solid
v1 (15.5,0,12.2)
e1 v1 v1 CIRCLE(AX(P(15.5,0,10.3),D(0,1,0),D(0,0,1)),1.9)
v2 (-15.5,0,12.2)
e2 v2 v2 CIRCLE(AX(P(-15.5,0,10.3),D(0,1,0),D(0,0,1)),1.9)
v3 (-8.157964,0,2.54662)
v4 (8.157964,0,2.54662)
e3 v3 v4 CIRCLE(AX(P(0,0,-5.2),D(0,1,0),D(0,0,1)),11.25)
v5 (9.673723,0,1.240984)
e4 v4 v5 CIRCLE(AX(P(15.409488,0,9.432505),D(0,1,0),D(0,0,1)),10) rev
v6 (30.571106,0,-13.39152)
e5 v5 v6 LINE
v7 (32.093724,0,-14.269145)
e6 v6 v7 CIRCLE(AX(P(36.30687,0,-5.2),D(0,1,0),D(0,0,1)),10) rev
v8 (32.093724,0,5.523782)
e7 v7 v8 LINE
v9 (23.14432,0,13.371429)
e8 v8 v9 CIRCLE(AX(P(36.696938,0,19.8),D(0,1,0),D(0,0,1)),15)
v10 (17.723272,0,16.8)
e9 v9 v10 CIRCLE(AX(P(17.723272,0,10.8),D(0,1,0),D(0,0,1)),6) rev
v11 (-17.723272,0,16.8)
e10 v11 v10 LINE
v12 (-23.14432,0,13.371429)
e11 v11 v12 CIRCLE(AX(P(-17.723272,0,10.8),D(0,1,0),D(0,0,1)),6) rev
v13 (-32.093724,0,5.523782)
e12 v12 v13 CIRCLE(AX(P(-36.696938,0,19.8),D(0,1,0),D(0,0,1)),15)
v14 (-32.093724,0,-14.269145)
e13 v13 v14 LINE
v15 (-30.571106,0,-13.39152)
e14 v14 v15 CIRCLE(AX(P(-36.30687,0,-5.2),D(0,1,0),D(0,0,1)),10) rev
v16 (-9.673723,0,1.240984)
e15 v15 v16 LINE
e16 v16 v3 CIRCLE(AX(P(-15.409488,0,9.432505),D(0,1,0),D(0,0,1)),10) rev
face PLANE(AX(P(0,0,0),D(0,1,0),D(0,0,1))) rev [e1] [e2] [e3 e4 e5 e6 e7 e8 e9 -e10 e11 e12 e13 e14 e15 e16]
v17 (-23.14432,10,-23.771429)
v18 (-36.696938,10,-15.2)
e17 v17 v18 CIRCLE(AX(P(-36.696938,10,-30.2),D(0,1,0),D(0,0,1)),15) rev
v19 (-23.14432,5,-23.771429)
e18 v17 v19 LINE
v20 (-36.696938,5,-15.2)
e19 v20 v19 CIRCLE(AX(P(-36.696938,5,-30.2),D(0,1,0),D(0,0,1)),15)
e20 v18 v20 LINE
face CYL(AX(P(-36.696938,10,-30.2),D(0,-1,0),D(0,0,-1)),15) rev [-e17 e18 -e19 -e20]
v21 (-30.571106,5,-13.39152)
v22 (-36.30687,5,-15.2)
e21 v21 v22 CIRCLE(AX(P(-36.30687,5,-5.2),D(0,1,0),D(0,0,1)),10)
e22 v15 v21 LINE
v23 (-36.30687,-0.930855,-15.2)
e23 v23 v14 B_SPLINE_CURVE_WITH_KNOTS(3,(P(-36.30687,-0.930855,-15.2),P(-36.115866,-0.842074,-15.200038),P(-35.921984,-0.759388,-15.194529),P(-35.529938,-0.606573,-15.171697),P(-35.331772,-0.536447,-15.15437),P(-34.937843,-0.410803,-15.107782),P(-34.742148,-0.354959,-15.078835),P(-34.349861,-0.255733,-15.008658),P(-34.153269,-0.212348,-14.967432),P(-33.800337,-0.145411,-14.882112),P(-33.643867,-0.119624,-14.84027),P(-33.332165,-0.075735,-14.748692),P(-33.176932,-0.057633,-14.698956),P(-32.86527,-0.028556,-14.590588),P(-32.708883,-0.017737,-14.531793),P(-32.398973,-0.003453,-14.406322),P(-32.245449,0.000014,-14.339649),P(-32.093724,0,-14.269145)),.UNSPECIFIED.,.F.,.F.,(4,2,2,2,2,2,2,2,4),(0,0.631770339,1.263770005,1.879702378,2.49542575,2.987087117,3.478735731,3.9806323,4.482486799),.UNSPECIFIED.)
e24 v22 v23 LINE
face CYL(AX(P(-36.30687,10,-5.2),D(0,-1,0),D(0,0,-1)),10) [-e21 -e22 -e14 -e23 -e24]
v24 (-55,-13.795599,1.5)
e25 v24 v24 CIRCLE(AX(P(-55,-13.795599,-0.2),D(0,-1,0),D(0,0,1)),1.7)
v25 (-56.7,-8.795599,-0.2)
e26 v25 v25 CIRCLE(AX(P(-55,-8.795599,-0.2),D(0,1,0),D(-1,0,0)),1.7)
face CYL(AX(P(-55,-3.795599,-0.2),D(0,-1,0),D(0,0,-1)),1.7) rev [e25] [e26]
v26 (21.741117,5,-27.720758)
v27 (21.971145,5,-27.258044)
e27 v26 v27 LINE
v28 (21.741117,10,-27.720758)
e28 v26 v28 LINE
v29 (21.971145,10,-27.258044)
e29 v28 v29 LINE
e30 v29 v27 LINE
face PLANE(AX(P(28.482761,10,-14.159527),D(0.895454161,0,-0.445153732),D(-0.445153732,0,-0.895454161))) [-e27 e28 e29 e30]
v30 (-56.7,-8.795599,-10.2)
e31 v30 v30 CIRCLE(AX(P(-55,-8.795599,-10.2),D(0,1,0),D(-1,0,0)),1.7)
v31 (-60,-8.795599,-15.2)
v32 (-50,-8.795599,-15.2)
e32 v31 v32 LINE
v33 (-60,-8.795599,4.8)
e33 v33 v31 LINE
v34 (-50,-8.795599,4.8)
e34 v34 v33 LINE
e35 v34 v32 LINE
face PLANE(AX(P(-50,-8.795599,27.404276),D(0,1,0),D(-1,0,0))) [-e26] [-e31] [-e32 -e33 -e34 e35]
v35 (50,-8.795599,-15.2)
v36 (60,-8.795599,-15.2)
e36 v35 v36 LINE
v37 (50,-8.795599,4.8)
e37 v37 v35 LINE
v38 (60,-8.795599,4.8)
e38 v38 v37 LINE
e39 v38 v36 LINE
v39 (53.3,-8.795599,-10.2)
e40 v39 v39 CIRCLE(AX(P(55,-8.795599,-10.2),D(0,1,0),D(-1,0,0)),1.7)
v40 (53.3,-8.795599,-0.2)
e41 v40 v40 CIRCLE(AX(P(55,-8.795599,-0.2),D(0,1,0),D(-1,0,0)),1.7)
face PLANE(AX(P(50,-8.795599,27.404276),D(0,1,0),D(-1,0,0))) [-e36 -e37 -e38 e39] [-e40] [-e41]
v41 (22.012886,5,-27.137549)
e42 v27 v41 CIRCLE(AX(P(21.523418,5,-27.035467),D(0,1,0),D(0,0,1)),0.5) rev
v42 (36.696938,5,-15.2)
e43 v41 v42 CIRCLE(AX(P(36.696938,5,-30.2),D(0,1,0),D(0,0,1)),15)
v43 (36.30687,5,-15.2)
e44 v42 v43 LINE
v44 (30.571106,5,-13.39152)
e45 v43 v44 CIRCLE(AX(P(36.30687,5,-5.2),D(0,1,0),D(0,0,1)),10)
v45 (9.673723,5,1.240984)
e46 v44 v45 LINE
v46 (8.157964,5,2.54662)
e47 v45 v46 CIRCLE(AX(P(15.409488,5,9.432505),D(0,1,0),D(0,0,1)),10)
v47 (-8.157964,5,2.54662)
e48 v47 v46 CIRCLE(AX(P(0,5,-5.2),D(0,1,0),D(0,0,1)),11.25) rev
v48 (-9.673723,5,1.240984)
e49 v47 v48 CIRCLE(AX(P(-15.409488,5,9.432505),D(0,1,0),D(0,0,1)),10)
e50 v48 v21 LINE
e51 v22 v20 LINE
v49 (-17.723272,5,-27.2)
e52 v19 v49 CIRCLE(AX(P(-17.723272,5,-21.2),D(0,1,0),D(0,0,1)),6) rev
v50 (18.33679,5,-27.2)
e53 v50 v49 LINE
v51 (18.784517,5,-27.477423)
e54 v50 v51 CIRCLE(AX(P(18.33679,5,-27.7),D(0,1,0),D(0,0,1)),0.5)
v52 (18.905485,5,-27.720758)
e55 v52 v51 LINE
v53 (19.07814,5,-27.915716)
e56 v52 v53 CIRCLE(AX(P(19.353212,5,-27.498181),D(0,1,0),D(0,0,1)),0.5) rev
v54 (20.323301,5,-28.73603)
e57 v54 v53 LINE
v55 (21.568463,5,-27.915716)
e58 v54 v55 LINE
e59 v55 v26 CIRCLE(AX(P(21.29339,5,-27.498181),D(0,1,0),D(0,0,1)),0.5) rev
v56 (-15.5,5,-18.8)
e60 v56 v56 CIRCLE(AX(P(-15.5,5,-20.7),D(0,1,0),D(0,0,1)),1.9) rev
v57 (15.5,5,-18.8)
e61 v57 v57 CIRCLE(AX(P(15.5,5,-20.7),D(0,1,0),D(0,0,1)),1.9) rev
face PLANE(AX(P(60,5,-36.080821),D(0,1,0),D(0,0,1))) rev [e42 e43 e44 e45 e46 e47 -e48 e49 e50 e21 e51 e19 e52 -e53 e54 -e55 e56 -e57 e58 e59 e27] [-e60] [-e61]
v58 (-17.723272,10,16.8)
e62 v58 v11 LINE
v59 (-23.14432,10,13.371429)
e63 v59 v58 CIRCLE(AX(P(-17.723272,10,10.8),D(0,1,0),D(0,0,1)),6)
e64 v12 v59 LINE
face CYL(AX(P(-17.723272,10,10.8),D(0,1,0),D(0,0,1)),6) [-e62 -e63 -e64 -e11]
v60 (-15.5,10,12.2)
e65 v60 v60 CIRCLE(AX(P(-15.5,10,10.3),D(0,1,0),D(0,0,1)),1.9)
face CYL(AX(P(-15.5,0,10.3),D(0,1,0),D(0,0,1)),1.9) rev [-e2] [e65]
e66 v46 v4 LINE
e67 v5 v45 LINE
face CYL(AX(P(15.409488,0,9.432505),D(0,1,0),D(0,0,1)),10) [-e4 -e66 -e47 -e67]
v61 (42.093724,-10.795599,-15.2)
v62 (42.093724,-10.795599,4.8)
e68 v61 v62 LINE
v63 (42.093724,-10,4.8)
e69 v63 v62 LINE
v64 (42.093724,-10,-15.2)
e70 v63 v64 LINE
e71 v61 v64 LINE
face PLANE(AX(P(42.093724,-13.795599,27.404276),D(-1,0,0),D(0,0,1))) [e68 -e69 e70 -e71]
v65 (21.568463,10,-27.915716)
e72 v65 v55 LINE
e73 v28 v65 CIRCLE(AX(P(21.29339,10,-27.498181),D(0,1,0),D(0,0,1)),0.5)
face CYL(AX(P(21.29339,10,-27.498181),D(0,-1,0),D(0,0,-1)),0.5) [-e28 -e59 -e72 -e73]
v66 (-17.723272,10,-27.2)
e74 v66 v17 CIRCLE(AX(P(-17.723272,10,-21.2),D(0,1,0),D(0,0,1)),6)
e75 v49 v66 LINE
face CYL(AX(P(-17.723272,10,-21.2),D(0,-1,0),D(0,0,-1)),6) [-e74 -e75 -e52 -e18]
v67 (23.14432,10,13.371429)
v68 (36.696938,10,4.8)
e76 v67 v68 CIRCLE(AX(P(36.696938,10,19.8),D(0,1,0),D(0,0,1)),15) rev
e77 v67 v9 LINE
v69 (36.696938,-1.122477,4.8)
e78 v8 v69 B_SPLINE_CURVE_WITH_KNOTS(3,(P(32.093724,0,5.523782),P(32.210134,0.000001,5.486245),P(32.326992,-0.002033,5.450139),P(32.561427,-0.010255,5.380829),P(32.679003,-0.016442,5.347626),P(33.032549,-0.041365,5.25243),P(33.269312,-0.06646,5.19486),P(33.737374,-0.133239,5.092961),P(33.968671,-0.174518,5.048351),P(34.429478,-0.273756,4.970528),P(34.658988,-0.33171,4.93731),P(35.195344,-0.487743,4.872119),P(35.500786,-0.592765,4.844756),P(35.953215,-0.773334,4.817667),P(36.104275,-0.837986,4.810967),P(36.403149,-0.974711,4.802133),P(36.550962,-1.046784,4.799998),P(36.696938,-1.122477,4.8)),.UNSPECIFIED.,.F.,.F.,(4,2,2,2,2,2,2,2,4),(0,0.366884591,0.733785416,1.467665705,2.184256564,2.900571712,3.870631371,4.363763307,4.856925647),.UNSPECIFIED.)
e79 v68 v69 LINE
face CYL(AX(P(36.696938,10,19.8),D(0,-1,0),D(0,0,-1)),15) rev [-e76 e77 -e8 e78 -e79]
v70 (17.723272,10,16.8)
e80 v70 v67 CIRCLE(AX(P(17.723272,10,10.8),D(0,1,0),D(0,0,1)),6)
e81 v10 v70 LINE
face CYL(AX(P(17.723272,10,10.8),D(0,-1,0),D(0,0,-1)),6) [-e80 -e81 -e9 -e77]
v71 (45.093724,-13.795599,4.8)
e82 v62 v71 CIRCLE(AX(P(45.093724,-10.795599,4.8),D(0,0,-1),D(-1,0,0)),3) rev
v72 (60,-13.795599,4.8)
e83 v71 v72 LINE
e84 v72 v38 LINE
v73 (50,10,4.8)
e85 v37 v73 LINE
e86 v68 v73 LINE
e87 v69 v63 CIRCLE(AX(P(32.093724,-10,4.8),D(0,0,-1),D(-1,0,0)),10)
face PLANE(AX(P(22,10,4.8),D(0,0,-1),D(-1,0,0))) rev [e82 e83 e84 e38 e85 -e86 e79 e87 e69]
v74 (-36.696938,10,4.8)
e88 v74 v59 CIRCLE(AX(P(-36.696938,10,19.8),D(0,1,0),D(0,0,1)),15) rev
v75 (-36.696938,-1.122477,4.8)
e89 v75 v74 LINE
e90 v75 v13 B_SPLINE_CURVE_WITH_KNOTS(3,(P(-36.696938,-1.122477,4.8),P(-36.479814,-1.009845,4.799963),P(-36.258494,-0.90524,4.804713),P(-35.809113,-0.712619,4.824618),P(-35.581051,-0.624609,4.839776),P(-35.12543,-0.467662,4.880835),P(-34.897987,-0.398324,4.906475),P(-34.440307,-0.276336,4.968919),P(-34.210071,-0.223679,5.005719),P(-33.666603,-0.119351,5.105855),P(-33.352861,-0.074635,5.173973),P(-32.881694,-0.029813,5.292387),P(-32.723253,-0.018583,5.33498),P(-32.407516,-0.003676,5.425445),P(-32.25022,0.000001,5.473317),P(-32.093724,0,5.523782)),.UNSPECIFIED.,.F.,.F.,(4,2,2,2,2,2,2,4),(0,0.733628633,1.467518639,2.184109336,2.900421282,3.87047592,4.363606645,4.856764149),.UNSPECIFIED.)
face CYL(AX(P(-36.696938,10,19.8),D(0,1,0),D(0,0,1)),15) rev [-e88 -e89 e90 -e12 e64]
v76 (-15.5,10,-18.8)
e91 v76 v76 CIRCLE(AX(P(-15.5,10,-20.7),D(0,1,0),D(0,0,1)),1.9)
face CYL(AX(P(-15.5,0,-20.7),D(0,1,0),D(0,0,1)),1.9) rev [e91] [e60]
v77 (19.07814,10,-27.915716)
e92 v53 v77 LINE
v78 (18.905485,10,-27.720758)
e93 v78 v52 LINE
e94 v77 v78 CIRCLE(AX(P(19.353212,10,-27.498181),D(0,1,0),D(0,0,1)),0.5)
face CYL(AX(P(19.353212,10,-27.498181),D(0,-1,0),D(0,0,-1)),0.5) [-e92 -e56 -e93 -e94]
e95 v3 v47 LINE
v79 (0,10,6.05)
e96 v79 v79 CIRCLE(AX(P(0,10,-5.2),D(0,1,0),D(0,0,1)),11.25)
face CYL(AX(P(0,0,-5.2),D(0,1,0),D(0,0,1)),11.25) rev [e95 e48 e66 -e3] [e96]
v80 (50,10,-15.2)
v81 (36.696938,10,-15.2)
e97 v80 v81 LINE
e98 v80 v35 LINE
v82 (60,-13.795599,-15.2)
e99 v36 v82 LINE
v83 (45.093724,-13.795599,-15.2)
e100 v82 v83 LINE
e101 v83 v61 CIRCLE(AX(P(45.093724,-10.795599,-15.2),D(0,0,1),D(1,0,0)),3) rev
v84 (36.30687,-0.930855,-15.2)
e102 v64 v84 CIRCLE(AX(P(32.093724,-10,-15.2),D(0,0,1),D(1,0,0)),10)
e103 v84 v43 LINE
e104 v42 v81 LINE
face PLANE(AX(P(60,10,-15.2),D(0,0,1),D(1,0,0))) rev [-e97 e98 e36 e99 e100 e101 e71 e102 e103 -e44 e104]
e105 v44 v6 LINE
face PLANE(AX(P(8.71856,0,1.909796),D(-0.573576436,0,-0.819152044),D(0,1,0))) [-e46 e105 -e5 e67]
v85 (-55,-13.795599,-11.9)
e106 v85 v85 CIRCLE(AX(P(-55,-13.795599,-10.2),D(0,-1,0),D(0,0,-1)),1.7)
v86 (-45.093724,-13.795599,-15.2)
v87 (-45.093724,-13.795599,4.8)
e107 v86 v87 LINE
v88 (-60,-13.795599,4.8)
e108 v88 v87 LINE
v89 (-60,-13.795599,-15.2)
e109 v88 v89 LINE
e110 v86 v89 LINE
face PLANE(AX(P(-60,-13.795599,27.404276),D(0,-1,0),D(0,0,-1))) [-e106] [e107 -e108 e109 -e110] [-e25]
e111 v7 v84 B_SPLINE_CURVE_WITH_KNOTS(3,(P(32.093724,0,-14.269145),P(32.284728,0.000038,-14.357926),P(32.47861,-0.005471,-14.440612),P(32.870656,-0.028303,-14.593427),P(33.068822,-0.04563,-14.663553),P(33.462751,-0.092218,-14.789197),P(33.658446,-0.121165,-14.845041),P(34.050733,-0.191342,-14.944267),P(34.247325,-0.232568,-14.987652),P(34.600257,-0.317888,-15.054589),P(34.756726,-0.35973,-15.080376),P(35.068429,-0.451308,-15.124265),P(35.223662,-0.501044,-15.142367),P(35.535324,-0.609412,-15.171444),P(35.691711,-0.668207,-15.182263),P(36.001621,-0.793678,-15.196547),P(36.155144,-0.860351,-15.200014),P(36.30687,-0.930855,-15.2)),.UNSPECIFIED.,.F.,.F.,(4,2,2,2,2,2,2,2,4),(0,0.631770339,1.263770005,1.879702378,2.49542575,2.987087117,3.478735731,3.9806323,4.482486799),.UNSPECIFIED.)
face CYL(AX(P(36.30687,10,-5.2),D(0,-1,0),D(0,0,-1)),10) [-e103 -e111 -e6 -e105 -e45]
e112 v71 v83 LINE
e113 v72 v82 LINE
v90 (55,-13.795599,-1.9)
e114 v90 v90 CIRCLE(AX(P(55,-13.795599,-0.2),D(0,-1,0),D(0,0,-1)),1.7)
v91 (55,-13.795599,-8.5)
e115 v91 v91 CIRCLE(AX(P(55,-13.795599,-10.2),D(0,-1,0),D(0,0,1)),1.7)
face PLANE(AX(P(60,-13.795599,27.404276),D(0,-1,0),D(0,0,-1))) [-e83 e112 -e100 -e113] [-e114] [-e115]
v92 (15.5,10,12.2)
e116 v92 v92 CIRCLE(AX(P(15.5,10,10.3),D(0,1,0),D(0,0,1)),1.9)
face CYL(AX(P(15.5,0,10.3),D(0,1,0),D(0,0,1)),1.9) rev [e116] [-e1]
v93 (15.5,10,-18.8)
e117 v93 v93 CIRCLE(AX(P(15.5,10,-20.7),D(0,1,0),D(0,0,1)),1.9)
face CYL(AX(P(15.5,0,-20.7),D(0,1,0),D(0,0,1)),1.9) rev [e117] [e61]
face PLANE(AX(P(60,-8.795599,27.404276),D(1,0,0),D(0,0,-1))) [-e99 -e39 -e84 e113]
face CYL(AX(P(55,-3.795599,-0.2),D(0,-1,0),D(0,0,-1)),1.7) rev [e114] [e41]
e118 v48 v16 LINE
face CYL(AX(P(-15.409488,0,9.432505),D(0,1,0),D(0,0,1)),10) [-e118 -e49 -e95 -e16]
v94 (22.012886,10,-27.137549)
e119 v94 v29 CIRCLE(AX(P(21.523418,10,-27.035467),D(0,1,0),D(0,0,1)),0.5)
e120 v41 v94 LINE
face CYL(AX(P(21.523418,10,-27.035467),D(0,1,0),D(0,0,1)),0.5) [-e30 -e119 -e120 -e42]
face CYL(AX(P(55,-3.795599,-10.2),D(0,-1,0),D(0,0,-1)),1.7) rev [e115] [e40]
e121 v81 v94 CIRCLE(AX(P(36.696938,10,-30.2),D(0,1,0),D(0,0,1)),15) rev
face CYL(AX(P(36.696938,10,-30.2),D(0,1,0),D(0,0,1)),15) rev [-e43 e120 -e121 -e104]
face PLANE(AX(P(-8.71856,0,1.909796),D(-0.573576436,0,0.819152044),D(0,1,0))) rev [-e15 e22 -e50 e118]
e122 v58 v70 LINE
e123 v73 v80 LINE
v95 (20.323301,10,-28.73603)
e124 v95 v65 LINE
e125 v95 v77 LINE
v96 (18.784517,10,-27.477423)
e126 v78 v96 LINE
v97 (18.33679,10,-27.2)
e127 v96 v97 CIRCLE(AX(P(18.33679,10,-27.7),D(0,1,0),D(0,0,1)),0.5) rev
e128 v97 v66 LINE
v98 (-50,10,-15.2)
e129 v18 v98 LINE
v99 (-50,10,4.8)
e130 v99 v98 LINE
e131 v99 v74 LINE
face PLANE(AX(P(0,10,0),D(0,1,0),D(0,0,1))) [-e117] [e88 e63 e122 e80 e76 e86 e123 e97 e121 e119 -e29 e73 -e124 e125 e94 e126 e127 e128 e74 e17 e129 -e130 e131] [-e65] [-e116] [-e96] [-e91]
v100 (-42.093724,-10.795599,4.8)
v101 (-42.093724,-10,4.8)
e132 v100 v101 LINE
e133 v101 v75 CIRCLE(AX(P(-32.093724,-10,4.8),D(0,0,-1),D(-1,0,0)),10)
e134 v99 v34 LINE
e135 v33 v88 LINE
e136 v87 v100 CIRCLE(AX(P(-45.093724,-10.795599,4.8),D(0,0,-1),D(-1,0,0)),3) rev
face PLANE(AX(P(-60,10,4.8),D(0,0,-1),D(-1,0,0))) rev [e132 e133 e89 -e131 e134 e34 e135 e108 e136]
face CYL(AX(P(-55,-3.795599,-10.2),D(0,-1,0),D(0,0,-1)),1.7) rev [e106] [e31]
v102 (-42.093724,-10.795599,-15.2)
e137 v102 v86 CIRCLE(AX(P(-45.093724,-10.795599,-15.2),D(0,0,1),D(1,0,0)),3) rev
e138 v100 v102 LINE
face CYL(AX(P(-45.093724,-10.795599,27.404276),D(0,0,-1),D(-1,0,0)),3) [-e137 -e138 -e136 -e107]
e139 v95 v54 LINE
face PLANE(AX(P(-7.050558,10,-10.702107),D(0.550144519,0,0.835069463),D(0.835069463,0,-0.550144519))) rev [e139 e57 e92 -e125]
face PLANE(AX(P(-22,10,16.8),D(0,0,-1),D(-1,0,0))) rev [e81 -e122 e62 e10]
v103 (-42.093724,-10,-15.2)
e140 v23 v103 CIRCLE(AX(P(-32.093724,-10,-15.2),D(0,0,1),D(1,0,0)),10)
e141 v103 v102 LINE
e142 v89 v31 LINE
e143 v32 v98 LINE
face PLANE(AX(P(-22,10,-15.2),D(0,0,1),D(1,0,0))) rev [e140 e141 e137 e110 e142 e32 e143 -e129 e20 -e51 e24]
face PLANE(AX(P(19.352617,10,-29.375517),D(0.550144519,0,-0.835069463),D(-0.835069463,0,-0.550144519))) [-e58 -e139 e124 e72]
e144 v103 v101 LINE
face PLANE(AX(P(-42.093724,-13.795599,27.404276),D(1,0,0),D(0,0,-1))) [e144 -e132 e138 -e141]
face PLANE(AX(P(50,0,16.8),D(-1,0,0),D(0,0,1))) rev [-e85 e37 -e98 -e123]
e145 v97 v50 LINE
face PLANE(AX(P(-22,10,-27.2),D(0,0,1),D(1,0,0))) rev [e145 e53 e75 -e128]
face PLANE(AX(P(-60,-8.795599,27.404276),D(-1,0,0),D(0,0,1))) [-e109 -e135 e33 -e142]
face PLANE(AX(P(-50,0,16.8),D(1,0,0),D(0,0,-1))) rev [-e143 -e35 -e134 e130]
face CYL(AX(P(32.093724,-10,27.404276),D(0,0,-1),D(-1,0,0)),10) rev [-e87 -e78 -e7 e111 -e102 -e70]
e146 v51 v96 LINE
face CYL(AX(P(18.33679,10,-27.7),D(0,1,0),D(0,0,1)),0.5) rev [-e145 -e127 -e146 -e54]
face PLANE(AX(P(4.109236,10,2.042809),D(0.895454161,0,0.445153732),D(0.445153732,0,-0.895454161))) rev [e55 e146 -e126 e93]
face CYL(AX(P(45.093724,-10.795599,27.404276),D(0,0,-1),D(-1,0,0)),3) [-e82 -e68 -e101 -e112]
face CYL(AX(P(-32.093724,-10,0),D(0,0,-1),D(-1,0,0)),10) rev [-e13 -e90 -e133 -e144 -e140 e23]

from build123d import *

# Parameters (mm, degrees)
AUFSATZ_LINEAR_AUSTRAGEN1_DEPTH      = 10
SKIZZE6_R                            = 1.9
SKIZZE6_R_2                          = 11.25
SCHNITT_LINEAR_AUSTRAGEN4_DEPTH      = 67.632124385
SKIZZE7_W                            = 20.880821379
SKIZZE7_H                            = 5
SCHNITT_LINEAR_AUSTRAGEN5_DEPTH      = 87.970339772
VERRUNDUNG3_R                        = 15
SCHNITT_LINEAR_AUSTRAGEN6_DEPTH      = 69.73136111
SCHNITT_LINEAR_AUSTRAGEN6_DEPTH_BACK = 69.73136111
SKIZZE8_W                            = 10
SKIZZE8_H                            = 10
AUFSATZ_LINEAR_AUSTRAGEN4_DEPTH      = 20
VERRUNDUNG7_R                        = 10
VERRUNDUNG8_R                        = 3
SKIZZE16_R                           = 1.7
SCHNITT_LINEAR_AUSTRAGEN8_DEPTH      = 10
AUFSATZ_LINEAR_AUSTRAGEN6_DEPTH      = 5
VERRUNDUNG9_R                        = 0.5
FASE1_START                          = -13.795598923
FASE1_DEPTH                          = 18.795598923
VERRUNDUNG10_R                       = 10
VERRUNDUNG11_R                       = 6


with BuildPart() as part:
    # Skizze1 → Aufsatz-Linear austragen1 (new body)
    with BuildSketch(Plane(origin=(0, 0, 0), x_dir=(1, 0, 0), z_dir=(0, 1, 0))):
        Polygon((-60, -4.8), (-22, -4.8), (-22, -16.8), (22, -16.8), (22, -4.8), (60, -4.8), (60, 15.2), (22, 15.2), (22, 27.2), (0, 27.2), (-22, 27.2), (-22, 15.2), (-60, 15.2), align=None)
    extrude(amount=AUFSATZ_LINEAR_AUSTRAGEN1_DEPTH)

    # Skizze6 → Schnitt-Linear austragen4 (cut, through all)
    with BuildSketch(Plane(origin=(0, 10, 0), x_dir=(1, 0, 0), z_dir=(0, 1, 0))):
        with Locations(Location((15.5, 20.7, 0), (0, 0, 270))):
            Circle(SKIZZE6_R)
        with Locations(Location((15.5, -10.3, 0), (0, 0, 270))):
            Circle(SKIZZE6_R)
        with Locations(Location((-15.5, -10.3, 0), (0, 0, 270))):
            Circle(SKIZZE6_R)
        with Locations(Location((-15.5, 20.7, 0), (0, 0, 270))):
            Circle(SKIZZE6_R)
        with Locations(Location((0, 5.2, 0), (0, 0, 270))):
            Circle(SKIZZE6_R_2)
    extrude(amount=-SCHNITT_LINEAR_AUSTRAGEN4_DEPTH, mode=Mode.SUBTRACT)

    # Skizze7 → Schnitt-Linear austragen5 (cut, through all)
    with BuildSketch(Plane.ZY.offset(22)):
        with Locations((-25.64041069, 2.5)):
            Rectangle(SKIZZE7_W, SKIZZE7_H)
    extrude(amount=-SCHNITT_LINEAR_AUSTRAGEN5_DEPTH, mode=Mode.SUBTRACT)

    # Verrundung3
    # the kernel refuses this fillet: 15 mm, written as the material it adds along each edge
    with BuildSketch(Plane(origin=(-22, 5, -15.2), x_dir=(0, 0, -1), z_dir=(0, 1, 0))) as verrundung3_piece_1:
        with BuildLine():
            CenterArc((15, 14.696938457), VERRUNDUNG3_R, 180, 78.463040967)
            Line((0, 14.696938457), (-0.3, 14.696938457))
            Line((-0.3, 14.696938457), (-0.3, 0))
            Line((-0.3, 0), (0, -0.3))
            ThreePointArc((0, -0.3), (6, -0.3), (11.94, -0.293938769))
            Line((11.94, -0.293938769), (12, 0))
        make_face()
    extrude(amount=5)
    with BuildSketch(Plane(origin=(-22, 0, 4.8), x_dir=(-1, 0, 0), z_dir=(0, 1, 0))) as verrundung3_piece_2:
        with BuildLine():
            CenterArc((14.696938457, 15), VERRUNDUNG3_R, 191.536959033, 78.463040967)
            Line((0, 12), (-0.293938769, 11.94))
            ThreePointArc((-0.293938769, 11.94), (-0.3, 6), (-0.3, 0))
            Line((-0.3, 0), (0, -0.3))
            Line((0, -0.3), (14.696938457, -0.3))
            Line((14.696938457, -0.3), (14.696938457, 0))
        make_face()
    extrude(amount=10)
    with BuildSketch(Plane(origin=(22, 0, 4.8), x_dir=(1, 0, 0), z_dir=(0, 1, 0))) as verrundung3_piece_3:
        with BuildLine():
            CenterArc((14.696938457, -15), VERRUNDUNG3_R, 90, 78.463040967)
            Line((0, -12), (-0.293938769, -11.94))
            ThreePointArc((-0.293938769, -11.94), (-0.3, -6), (-0.3, 0))
            Line((-0.3, 0), (0, 0.3))
            Line((0, 0.3), (14.696938457, 0.3))
            Line((14.696938457, 0.3), (14.696938457, 0))
        make_face()
    extrude(amount=10)
    with BuildSketch(Plane(origin=(22, 5, -15.2), x_dir=(1, 0, 0), z_dir=(0, 1, 0))) as verrundung3_piece_4:
        with BuildLine():
            CenterArc((14.696938457, 15), VERRUNDUNG3_R, 191.536959033, 78.463040967)
            Line((0, 12), (-0.293938769, 11.94))
            ThreePointArc((-0.293938769, 11.94), (-0.3, 6), (-0.3, 0))
            Line((-0.3, 0), (0, -0.3))
            Line((0, -0.3), (14.696938457, -0.3))
            Line((14.696938457, -0.3), (14.696938457, 0))
        make_face()
    extrude(amount=5)

    # Skizze8 → Schnitt-Linear austragen6 (cut, two sides: drawn at the far end of the back side and taken through both)
    with BuildSketch(Plane(origin=(0, 0, -15.2), x_dir=(-1, 0, 0), z_dir=(0, 0, -1)).offset(-SCHNITT_LINEAR_AUSTRAGEN6_DEPTH_BACK)):
        with Locations((-55, 5)):
            Rectangle(SKIZZE8_W, SKIZZE8_H)
        with Locations((55, 5)):
            Rectangle(SKIZZE8_W, SKIZZE8_H)
    extrude(amount=SCHNITT_LINEAR_AUSTRAGEN6_DEPTH + SCHNITT_LINEAR_AUSTRAGEN6_DEPTH_BACK, mode=Mode.SUBTRACT)

    # Skizze12 → Aufsatz-Linear austragen4 (add)
    with BuildSketch(Plane(origin=(0, 0, -15.2), x_dir=(-1, 0, 0), z_dir=(0, 0, -1))):
        Polygon((-50, 0), (-50, -8.795598923), (-60, -8.795598923), (-60, -13.795598923), (-42.093723734, -13.795598923), (-42.093723734, 0), align=None)
        Polygon((50, 0), (42.093723734, 0), (42.093723734, -13.795598923), (60, -13.795598923), (60, -8.795598923), (50, -8.795598923), align=None)
    extrude(amount=-AUFSATZ_LINEAR_AUSTRAGEN4_DEPTH)

    # Verrundung7
    verrundung7_edges = [part.edges().sort_by_distance(p)[0] for p in [
        (42.093723734, 0, -5.2),
        (-42.093723734, 0, -5.2),
    ]]
    fillet(verrundung7_edges, radius=VERRUNDUNG7_R)

    # Verrundung8
    verrundung8_edges = [part.edges().sort_by_distance(p)[0] for p in [
        (42.093723734, -13.795598923, -5.2),
        (-42.093723734, -13.795598923, -5.2),
    ]]
    fillet(verrundung8_edges, radius=VERRUNDUNG8_R)

    # Skizze16 → Schnitt-Linear austragen8 (cut)
    with BuildSketch(Plane.XZ.offset(13.795598923)):
        with Locations(Location((-55, -10.2, 0), (0, 0, 270))):
            Circle(SKIZZE16_R)
        with Locations(Location((-55, -0.2, 0), (0, 0, 180))):
            Circle(SKIZZE16_R)
        with Locations(Location((55, -0.2, 0), (0, 0, 270))):
            Circle(SKIZZE16_R)
        with Locations(Location((55, -10.2, 0), (0, 0, 180))):
            Circle(SKIZZE16_R)
    extrude(amount=-SCHNITT_LINEAR_AUSTRAGEN8_DEPTH, mode=Mode.SUBTRACT)

    # Skizze17 → Aufsatz-Linear austragen6 (add)
    with BuildSketch(Plane.XZ.offset(-5)):
        Polygon((22, -27.2), (20.323301152, -27.2), (20.323301152, -28.736029672), (21.681082582, -27.841522035), align=None)
        Polygon((20.323301152, -28.736029672), (20.323301152, -27.2), (18.646602303, -27.2), (18.965519721, -27.841522035), align=None)
    extrude(amount=-AUFSATZ_LINEAR_AUSTRAGEN6_DEPTH)

    # Verrundung9
    verrundung9_edges = [part.edges().sort_by_distance(p)[0] for p in [
        (22, 7.5, -27.2),
        (18.646602303, 7.5, -27.2),
        (21.681082582, 7.5, -27.841522035),
        (18.965519721, 7.5, -27.841522035),
    ]]
    fillet(verrundung9_edges, radius=VERRUNDUNG9_R)

    # Fase1: read off the stored shape, not the designer's step
    # Fase1 outline → Fase1 (cut)
    with BuildSketch(Plane(origin=(0, 0, 0), x_dir=(1, 0, 0), z_dir=(0, 1, 0)).offset(FASE1_START)):
        with BuildLine():
            Line((-5.153882032, 15.2), (-33.153882032, 15.2))
            Line((-33.153882032, 15.2), (-8.71856035, -1.90979644))
            ThreePointArc((-8.71856035, -1.90979644), (-11.013512063, 7.494570119), (-5.153882032, 15.2))
        make_face()
        with BuildLine():
            ThreePointArc((5.153882032, 15.2), (11.013512063, 7.494570119), (8.71856035, -1.90979644))
            Line((8.71856035, -1.90979644), (33.153882032, 15.2))
            Line((33.153882032, 15.2), (5.153882032, 15.2))
        make_face()
    extrude(amount=FASE1_DEPTH, mode=Mode.SUBTRACT)

    # Verrundung10
    verrundung10_edges = [part.edges().sort_by_distance(p)[0] for p in [
        (-8.71856035, 2.5, 1.90979644),
        (8.71856035, 2.5, 1.90979644),
        (-33.153882032, 2.471822211, -15.2),
        (33.153882032, 2.471822211, -15.2),
    ]]
    fillet(verrundung10_edges, radius=VERRUNDUNG10_R)

    # Verrundung11
    verrundung11_edges = [part.edges().sort_by_distance(p)[0] for p in [
        (22, 5, 16.8),
        (-22, 5, 16.8),
        (-22, 7.5, -27.2),
    ]]
    fillet(verrundung11_edges, radius=VERRUNDUNG11_R)


solid = part.part
